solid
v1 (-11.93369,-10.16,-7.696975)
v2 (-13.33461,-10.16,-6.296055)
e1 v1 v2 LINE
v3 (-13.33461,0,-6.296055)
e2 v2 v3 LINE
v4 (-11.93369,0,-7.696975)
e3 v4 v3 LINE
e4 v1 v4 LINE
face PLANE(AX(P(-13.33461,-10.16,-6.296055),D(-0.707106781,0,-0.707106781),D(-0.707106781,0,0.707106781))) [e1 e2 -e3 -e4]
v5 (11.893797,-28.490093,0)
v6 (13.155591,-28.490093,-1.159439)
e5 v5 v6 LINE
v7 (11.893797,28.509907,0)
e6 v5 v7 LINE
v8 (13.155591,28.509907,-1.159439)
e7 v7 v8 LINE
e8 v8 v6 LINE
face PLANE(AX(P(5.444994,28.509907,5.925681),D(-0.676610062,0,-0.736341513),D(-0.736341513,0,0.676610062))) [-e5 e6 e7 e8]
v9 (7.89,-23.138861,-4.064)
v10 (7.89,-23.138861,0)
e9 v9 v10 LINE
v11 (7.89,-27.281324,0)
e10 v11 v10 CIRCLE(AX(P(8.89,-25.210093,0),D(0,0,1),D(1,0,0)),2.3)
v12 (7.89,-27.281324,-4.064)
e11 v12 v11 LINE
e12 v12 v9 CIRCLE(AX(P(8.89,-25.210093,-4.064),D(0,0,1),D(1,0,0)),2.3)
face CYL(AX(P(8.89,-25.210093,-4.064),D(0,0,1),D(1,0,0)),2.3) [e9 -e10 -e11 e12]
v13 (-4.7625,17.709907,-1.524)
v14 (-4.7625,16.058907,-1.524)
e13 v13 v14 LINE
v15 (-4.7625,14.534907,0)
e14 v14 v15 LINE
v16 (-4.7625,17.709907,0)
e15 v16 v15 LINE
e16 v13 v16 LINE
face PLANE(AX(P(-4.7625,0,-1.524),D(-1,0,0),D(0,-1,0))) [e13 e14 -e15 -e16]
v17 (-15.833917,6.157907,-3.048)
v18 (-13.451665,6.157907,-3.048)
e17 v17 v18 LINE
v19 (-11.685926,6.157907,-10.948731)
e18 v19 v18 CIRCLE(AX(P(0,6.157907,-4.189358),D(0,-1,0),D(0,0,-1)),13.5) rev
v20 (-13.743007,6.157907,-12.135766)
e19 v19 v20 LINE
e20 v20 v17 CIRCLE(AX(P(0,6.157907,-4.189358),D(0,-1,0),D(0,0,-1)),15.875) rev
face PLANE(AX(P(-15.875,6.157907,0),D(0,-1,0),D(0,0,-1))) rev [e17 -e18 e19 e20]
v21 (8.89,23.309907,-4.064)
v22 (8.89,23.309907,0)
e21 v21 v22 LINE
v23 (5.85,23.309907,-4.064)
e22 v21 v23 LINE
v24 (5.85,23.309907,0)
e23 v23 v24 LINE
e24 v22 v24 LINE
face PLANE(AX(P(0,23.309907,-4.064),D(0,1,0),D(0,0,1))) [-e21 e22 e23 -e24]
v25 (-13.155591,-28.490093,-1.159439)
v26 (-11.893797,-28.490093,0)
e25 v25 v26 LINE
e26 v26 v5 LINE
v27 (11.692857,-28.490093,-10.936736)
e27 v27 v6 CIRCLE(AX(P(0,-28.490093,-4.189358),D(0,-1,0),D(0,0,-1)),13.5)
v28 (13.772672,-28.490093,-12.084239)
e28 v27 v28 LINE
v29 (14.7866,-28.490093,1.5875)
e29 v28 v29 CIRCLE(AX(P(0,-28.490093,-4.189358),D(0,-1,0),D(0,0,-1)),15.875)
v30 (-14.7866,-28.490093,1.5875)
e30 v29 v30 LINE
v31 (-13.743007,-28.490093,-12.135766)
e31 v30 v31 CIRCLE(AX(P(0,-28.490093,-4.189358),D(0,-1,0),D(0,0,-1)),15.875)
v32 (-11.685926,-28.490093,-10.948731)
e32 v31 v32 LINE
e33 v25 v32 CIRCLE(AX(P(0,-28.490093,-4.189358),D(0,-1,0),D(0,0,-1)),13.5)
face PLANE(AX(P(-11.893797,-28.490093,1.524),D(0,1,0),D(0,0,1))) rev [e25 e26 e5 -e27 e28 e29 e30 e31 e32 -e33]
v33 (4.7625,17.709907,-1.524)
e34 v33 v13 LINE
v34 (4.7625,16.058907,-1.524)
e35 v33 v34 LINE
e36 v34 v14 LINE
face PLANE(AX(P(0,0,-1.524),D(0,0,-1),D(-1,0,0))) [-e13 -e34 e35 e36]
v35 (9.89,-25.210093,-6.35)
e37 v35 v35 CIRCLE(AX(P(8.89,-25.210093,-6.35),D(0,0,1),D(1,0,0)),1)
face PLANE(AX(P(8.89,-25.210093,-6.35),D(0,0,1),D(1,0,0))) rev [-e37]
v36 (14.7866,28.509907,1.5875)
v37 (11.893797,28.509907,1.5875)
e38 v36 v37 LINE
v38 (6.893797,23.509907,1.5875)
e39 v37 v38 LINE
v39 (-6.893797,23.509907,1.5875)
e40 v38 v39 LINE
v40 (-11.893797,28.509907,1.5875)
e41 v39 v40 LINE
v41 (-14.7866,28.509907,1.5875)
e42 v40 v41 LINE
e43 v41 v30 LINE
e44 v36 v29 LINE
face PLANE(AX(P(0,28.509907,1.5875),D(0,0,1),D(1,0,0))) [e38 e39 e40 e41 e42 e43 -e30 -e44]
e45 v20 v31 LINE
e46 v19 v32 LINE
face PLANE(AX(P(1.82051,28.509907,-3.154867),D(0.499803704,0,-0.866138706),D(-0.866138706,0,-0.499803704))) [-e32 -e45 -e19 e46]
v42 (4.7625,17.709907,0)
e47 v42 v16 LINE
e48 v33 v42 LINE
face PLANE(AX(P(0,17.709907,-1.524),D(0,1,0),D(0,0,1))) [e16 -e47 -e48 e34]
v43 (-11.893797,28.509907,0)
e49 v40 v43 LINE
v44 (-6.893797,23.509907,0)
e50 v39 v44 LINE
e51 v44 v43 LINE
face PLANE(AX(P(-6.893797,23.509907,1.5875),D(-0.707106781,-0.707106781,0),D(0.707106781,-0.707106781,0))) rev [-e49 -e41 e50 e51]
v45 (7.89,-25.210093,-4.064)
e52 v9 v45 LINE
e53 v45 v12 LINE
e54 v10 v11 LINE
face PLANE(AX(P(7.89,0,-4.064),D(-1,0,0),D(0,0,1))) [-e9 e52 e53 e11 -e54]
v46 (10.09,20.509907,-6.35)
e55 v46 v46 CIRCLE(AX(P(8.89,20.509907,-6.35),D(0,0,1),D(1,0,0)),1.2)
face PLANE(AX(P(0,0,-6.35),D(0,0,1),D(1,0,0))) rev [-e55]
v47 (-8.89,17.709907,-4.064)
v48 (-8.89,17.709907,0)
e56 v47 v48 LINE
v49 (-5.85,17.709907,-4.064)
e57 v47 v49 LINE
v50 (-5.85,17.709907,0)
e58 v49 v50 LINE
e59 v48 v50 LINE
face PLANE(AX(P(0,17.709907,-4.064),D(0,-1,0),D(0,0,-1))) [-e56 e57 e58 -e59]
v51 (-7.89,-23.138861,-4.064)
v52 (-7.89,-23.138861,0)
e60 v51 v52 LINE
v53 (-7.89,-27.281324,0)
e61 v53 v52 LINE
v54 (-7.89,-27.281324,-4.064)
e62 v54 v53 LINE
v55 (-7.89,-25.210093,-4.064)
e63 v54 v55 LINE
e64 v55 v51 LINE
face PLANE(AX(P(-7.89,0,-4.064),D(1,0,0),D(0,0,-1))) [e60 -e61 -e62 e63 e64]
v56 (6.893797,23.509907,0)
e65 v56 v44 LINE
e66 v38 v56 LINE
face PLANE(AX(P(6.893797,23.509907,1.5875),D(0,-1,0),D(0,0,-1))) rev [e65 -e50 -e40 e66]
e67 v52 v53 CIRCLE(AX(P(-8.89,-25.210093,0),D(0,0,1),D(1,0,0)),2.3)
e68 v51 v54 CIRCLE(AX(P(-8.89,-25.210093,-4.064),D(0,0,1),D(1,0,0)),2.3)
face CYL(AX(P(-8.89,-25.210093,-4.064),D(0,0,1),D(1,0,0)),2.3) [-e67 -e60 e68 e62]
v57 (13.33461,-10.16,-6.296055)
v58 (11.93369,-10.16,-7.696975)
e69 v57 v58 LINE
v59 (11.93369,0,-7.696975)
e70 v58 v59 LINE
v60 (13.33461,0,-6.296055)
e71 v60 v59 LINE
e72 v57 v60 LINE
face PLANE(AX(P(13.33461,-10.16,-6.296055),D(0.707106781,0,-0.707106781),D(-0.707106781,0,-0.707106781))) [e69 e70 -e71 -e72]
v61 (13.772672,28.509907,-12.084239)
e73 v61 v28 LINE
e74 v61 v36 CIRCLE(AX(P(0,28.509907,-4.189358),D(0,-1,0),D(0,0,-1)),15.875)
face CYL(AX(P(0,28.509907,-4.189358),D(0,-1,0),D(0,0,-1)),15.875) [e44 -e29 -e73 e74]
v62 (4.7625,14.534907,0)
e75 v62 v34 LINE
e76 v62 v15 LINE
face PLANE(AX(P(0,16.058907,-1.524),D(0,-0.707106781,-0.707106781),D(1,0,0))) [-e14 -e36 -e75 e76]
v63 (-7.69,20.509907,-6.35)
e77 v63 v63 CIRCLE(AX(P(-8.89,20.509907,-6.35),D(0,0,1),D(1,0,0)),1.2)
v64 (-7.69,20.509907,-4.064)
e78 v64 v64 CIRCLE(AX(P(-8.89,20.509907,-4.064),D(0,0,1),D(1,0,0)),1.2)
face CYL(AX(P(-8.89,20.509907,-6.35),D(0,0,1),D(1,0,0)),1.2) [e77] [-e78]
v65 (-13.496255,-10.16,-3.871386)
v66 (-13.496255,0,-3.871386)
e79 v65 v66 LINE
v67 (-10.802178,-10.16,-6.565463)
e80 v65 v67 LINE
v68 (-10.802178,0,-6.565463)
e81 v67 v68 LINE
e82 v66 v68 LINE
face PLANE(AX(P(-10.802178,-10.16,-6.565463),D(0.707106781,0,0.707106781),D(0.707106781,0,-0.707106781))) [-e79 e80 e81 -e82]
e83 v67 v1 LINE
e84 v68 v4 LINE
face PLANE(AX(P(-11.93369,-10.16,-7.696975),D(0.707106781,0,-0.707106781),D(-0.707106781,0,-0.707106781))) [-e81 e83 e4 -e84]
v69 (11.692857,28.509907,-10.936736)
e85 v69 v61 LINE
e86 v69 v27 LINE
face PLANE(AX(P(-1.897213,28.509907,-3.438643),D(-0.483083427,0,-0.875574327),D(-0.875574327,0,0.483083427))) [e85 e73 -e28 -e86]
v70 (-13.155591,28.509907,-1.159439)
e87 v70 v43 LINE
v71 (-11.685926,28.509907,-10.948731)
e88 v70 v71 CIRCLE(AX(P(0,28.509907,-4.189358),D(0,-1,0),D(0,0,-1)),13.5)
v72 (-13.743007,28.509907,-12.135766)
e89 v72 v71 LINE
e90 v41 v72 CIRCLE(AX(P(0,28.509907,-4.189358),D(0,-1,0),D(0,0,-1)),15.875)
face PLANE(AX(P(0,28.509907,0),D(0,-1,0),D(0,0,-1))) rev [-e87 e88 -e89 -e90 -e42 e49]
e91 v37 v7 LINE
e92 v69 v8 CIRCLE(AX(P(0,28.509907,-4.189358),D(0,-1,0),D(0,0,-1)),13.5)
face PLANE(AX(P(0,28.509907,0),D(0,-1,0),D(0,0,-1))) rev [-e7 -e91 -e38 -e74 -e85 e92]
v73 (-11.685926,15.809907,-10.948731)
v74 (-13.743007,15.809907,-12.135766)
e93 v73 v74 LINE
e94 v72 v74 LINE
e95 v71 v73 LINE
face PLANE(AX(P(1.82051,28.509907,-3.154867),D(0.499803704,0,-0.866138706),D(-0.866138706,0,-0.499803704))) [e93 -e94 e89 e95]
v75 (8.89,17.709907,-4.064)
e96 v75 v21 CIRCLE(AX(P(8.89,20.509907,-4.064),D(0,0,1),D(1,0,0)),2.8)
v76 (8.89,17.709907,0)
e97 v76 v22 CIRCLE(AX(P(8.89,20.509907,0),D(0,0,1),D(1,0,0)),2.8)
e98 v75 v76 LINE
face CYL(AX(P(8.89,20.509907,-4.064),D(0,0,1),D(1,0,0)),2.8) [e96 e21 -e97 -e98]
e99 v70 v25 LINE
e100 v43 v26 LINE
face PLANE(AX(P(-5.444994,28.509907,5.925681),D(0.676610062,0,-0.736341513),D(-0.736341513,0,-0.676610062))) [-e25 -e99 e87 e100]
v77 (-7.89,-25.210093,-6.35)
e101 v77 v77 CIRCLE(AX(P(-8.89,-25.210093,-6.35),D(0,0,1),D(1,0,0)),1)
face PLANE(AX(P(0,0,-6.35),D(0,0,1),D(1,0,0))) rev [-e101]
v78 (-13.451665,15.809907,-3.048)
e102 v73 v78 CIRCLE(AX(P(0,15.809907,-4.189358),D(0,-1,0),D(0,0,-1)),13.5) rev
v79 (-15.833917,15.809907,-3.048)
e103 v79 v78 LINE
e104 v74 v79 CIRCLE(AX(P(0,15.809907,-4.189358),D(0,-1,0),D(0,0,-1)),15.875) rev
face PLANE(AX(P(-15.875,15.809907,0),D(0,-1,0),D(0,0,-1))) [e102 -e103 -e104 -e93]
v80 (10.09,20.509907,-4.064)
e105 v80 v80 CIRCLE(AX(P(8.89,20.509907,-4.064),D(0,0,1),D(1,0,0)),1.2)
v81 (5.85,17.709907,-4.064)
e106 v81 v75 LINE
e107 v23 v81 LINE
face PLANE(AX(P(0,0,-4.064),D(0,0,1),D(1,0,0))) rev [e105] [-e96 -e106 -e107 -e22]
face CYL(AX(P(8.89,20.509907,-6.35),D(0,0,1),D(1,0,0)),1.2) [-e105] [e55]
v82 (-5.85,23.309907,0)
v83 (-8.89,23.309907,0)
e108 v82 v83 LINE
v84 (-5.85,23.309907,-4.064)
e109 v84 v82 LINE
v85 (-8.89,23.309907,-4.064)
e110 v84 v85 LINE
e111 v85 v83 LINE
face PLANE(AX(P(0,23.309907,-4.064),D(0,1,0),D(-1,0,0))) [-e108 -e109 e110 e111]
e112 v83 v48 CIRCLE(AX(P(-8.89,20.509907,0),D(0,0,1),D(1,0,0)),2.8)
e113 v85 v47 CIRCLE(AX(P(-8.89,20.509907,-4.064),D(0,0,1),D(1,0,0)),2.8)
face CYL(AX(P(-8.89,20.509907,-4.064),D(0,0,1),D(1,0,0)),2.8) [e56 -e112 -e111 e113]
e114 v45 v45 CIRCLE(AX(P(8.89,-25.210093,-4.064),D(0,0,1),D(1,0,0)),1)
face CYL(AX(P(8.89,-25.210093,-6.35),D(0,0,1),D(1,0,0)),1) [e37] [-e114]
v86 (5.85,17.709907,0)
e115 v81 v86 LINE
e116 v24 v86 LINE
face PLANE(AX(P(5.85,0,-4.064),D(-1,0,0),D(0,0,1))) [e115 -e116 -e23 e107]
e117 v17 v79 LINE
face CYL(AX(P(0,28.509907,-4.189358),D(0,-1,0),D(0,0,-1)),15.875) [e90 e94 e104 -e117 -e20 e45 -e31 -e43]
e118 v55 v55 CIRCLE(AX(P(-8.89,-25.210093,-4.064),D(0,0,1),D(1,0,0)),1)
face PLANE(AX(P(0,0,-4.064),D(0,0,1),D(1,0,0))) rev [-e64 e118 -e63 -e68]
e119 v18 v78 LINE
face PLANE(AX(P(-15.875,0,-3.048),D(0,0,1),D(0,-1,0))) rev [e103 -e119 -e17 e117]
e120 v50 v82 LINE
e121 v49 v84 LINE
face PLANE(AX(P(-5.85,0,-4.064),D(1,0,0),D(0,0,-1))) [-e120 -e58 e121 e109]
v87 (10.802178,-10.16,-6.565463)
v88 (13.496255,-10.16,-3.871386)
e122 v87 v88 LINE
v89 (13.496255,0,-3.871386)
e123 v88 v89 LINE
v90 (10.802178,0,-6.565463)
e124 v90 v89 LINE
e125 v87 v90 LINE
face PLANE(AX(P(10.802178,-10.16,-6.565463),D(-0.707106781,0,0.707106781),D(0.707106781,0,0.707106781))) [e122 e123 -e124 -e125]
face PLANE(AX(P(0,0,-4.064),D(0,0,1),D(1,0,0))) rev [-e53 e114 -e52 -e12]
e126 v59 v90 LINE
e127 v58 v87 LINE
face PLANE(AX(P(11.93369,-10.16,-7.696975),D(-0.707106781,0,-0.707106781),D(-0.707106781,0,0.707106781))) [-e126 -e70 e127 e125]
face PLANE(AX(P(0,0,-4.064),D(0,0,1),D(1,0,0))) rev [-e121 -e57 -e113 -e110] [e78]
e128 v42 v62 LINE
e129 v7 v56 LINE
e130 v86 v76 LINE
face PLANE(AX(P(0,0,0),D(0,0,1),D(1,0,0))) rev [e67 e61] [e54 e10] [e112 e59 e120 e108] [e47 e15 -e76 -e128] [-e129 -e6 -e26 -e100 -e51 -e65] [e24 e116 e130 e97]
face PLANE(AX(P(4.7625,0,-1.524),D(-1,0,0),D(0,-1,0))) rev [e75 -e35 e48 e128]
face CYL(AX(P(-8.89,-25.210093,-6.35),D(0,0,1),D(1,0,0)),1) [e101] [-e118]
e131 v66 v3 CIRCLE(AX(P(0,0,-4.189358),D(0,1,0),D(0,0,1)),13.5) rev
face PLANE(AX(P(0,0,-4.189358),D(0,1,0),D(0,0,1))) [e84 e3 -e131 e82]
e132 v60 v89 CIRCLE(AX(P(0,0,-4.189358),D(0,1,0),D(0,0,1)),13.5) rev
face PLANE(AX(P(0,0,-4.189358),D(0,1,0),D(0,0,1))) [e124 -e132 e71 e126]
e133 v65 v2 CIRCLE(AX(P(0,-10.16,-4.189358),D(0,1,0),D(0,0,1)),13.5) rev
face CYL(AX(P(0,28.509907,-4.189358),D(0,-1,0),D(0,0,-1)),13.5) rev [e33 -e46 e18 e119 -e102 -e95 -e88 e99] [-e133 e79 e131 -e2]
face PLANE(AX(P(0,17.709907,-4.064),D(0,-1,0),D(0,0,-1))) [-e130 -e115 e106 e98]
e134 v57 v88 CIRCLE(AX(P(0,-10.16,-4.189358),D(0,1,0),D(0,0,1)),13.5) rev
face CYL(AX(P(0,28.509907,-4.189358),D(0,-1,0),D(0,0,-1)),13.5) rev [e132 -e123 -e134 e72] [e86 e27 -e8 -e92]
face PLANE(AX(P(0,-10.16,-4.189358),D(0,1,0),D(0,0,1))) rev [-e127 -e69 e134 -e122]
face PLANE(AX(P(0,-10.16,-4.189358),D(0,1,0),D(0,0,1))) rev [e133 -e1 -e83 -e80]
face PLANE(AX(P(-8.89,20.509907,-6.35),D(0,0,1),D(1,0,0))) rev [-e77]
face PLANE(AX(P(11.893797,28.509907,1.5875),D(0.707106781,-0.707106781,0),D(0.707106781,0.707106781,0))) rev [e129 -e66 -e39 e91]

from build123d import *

# Parameters (mm, degrees)
BOSS_EXTRUDE1_DEPTH = 1.524
SKETCH1_3_R         = 1.2
BOSS_EXTRUDE2_DEPTH = 4.064
SKETCH1_4_R         = 1
SKETCH1_4_R_2       = 1.2
BOSS_EXTRUDE3_DEPTH = 6.35
SKETCH3_W           = 9.525
SKETCH3_H           = 3.175
BOSS_EXTRUDE4_DEPTH = 1.524
CHAMFER1_SIZE       = 1.524
BOSS_EXTRUDE5_START = -57
BOSS_EXTRUDE5_DEPTH = 57
CUT_EXTRUDE1_DEPTH  = 35.815330499
SKETCH6_W           = 17.468754951
SKETCH6_H           = 9.652
CUT_EXTRUDE2_DEPTH  = 35.815330499
BOSS_EXTRUDE6_DEPTH = 10.16


with BuildPart() as part:
    # Sketch1 → Boss-Extrude1 (new body)
    with BuildSketch(Plane(origin=(0, 0, 0), x_dir=(-1, 0, 0), z_dir=(0, 0, 1))):
        Polygon((11.893796958, -28.509907181), (11.893796958, 28.490092819), (-11.893796958, 28.490092819), (-11.893796958, -28.509907181), (-6.893796958, -23.509907181), (6.893796958, -23.509907181), align=None)
    extrude(amount=BOSS_EXTRUDE1_DEPTH)

    # Sketch1<3> → Boss-Extrude2 (add)
    # profile 1 of 4: a face of its own
    with BuildSketch(Plane(origin=(0, 0, 0), x_dir=(-1, 0, 0), z_dir=(0, 0, 1))):
        with BuildLine():
            ThreePointArc((-8.89, -17.709907181), (-11.69, -20.509907181), (-8.89, -23.309907181))
            Line((-8.89, -23.309907181), (-5.85, -23.309907181))
            Line((-5.85, -23.309907181), (-5.85, -17.709907181))
            Line((-5.85, -17.709907181), (-8.89, -17.709907181))
        make_face()
        with Locations(Location((-8.89, -20.509907181, 0), (0, 0, 180))):
            Circle(SKETCH1_3_R, mode=Mode.SUBTRACT)
    # profile 2 of 4: a face of its own
    with BuildSketch(Plane(origin=(0, 0, 0), x_dir=(-1, 0, 0), z_dir=(0, 0, 1))):
        with BuildLine():
            ThreePointArc((8.89, -23.309907181), (11.69, -20.509907181), (8.89, -17.709907181))
            Line((8.89, -17.709907181), (5.85, -17.709907181))
            Line((5.85, -17.709907181), (5.85, -23.309907181))
            Line((5.85, -23.309907181), (8.89, -23.309907181))
        make_face()
    # profile 3 of 4: a face of its own
    with BuildSketch(Plane(origin=(0, 0, 0), x_dir=(-1, 0, 0), z_dir=(0, 0, 1))):
        with BuildLine():
            ThreePointArc((7.89, 23.138861301), (11.19, 25.210092819), (7.89, 27.281324337))
            Line((7.89, 27.281324337), (7.89, 23.138861301))
        make_face()
    # profile 4 of 4: a face of its own
    with BuildSketch(Plane(origin=(0, 0, 0), x_dir=(-1, 0, 0), z_dir=(0, 0, 1))):
        with BuildLine():
            ThreePointArc((-7.89, 27.281324337), (-11.19, 25.210092819), (-7.89, 23.138861301))
            Line((-7.89, 23.138861301), (-7.89, 27.281324337))
        make_face()
    extrude(amount=-BOSS_EXTRUDE2_DEPTH)

    # Sketch1<4> → Boss-Extrude3 (add)
    with BuildSketch(Plane(origin=(0, 0, 0), x_dir=(-1, 0, 0), z_dir=(0, 0, 1))):
        with Locations(Location((8.89, 25.210092819, 0), (0, 0, 180))):
            Circle(SKETCH1_4_R)
        with Locations(Location((-8.89, -20.509907181, 0), (0, 0, 180))):
            Circle(SKETCH1_4_R_2)
        with Locations(Location((-8.89, 25.210092819, 0), (0, 0, 180))):
            Circle(SKETCH1_4_R)
        with Locations(Location((8.89, -20.509907181, 0), (0, 0, 180))):
            Circle(SKETCH1_4_R_2)
    extrude(amount=-BOSS_EXTRUDE3_DEPTH)

    # Sketch3 → Boss-Extrude4 (add)
    with BuildSketch(Plane(origin=(0, 0, 0), x_dir=(-1, 0, 0), z_dir=(0, 0, -1))):
        with Locations((0, 16.122407181)):
            Rectangle(SKETCH3_W, SKETCH3_H)
    extrude(amount=BOSS_EXTRUDE4_DEPTH)

    # Chamfer1
    chamfer1_edges = [part.edges().sort_by_distance(p)[0] for p in [
        (0, 14.534907181, -1.524),
    ]]
    chamfer(chamfer1_edges, length=CHAMFER1_SIZE - 0.0001)  # a hair under: the kernel refuses the full size

    # Sketch4 → Boss-Extrude5 (add)
    with BuildSketch(Plane.XZ.offset(28.490092819).offset(BOSS_EXTRUDE5_START)):
        with BuildLine():
            ThreePointArc((13.155591368, -1.15943863), (13.351412917, -6.186799511), (11.692856631, -10.936735779))
            Line((11.692856631, -10.936735779), (13.772671764, -12.084238841))
            ThreePointArc((13.772671764, -12.084238841), (15.831522609, -5.363460963), (14.786599753, 1.5875))
            Line((14.786599753, 1.5875), (-14.786599753, 1.5875))
            ThreePointArc((-14.786599753, 1.5875), (-15.829296194, -5.393105445), (-13.743006885, -12.135765541))
            Line((-13.743006885, -12.135765541), (-11.685926468, -10.948731172))
            ThreePointArc((-11.685926468, -10.948731172), (-13.350386295, -6.193649708), (-13.155591368, -1.15943863))
            Line((-13.155591368, -1.15943863), (-11.893796958, 0))
            Line((-11.893796958, 0), (11.893796958, 0))
            Line((11.893796958, 0), (13.155591368, -1.15943863))
        make_face()
    extrude(amount=BOSS_EXTRUDE5_DEPTH)

    # Sketch5 → Cut-Extrude1 (cut, through all)
    with BuildSketch(Plane(origin=(0, 0, 0), x_dir=(-1, 0, 0), z_dir=(0, 0, -1))):
        Polygon((11.893796958, 28.509907181), (-11.893796958, 28.509907181), (-6.893796958, 23.509907181), (6.893796958, 23.509907181), align=None)
    extrude(amount=-CUT_EXTRUDE1_DEPTH, mode=Mode.SUBTRACT)

    # Sketch6 → Cut-Extrude2 (cut, through all)
    with BuildSketch(Plane(origin=(0, 0, 0), x_dir=(0, 0, -1), z_dir=(1, 0, 0))):
        with Locations((11.782377476, 10.983907181)):
            Rectangle(SKETCH6_W, SKETCH6_H)
    extrude(amount=-CUT_EXTRUDE2_DEPTH, mode=Mode.SUBTRACT)

    # Sketch7 → Boss-Extrude6 (add)
    with BuildSketch(Plane(origin=(0, 0, 0), x_dir=(1, 0, 0), z_dir=(0, 1, 0))):
        with BuildLine():
            Line((-13.334610111, 6.296055118), (-11.933690156, 7.696975073))
            Line((-11.933690156, 7.696975073), (-10.802177885, 6.565462802))
            Line((-10.802177885, 6.565462802), (-13.496254721, 3.871385965))
            ThreePointArc((-13.496254721, 3.871385965), (-13.394733651, 2.5067686), (-13.155591368, 1.15943863))
            Line((-13.155591368, 1.15943863), (-11.893796958, 0))
            Line((-11.893796958, 0), (11.893796958, 0))
            Line((11.893796958, 0), (13.155591368, 1.15943863))
            ThreePointArc((13.155591368, 1.15943863), (13.394733651, 2.5067686), (13.496254721, 3.871385965))
            Line((13.496254721, 3.871385965), (10.802177885, 6.565462802))
            Line((10.802177885, 6.565462802), (11.933690156, 7.696975073))
            Line((11.933690156, 7.696975073), (13.334610111, 6.296055118))
            ThreePointArc((13.334610111, 6.296055118), (12.727038231, 8.691857223), (11.692856631, 10.936735779))
            Line((11.692856631, 10.936735779), (13.772671764, 12.084238841))
            ThreePointArc((13.772671764, 12.084238841), (15.831522609, 5.363460963), (14.786599753, -1.5875))
            Line((14.786599753, -1.5875), (-14.786599753, -1.5875))
            ThreePointArc((-14.786599753, -1.5875), (-15.829296194, 5.393105445), (-13.743006885, 12.135765541))
            Line((-13.743006885, 12.135765541), (-11.685926468, 10.948731172))
            ThreePointArc((-11.685926468, 10.948731172), (-12.724726374, 8.698386731), (-13.334610111, 6.296055118))
        make_face()
    extrude(amount=-BOSS_EXTRUDE6_DEPTH)


solid = part.part
